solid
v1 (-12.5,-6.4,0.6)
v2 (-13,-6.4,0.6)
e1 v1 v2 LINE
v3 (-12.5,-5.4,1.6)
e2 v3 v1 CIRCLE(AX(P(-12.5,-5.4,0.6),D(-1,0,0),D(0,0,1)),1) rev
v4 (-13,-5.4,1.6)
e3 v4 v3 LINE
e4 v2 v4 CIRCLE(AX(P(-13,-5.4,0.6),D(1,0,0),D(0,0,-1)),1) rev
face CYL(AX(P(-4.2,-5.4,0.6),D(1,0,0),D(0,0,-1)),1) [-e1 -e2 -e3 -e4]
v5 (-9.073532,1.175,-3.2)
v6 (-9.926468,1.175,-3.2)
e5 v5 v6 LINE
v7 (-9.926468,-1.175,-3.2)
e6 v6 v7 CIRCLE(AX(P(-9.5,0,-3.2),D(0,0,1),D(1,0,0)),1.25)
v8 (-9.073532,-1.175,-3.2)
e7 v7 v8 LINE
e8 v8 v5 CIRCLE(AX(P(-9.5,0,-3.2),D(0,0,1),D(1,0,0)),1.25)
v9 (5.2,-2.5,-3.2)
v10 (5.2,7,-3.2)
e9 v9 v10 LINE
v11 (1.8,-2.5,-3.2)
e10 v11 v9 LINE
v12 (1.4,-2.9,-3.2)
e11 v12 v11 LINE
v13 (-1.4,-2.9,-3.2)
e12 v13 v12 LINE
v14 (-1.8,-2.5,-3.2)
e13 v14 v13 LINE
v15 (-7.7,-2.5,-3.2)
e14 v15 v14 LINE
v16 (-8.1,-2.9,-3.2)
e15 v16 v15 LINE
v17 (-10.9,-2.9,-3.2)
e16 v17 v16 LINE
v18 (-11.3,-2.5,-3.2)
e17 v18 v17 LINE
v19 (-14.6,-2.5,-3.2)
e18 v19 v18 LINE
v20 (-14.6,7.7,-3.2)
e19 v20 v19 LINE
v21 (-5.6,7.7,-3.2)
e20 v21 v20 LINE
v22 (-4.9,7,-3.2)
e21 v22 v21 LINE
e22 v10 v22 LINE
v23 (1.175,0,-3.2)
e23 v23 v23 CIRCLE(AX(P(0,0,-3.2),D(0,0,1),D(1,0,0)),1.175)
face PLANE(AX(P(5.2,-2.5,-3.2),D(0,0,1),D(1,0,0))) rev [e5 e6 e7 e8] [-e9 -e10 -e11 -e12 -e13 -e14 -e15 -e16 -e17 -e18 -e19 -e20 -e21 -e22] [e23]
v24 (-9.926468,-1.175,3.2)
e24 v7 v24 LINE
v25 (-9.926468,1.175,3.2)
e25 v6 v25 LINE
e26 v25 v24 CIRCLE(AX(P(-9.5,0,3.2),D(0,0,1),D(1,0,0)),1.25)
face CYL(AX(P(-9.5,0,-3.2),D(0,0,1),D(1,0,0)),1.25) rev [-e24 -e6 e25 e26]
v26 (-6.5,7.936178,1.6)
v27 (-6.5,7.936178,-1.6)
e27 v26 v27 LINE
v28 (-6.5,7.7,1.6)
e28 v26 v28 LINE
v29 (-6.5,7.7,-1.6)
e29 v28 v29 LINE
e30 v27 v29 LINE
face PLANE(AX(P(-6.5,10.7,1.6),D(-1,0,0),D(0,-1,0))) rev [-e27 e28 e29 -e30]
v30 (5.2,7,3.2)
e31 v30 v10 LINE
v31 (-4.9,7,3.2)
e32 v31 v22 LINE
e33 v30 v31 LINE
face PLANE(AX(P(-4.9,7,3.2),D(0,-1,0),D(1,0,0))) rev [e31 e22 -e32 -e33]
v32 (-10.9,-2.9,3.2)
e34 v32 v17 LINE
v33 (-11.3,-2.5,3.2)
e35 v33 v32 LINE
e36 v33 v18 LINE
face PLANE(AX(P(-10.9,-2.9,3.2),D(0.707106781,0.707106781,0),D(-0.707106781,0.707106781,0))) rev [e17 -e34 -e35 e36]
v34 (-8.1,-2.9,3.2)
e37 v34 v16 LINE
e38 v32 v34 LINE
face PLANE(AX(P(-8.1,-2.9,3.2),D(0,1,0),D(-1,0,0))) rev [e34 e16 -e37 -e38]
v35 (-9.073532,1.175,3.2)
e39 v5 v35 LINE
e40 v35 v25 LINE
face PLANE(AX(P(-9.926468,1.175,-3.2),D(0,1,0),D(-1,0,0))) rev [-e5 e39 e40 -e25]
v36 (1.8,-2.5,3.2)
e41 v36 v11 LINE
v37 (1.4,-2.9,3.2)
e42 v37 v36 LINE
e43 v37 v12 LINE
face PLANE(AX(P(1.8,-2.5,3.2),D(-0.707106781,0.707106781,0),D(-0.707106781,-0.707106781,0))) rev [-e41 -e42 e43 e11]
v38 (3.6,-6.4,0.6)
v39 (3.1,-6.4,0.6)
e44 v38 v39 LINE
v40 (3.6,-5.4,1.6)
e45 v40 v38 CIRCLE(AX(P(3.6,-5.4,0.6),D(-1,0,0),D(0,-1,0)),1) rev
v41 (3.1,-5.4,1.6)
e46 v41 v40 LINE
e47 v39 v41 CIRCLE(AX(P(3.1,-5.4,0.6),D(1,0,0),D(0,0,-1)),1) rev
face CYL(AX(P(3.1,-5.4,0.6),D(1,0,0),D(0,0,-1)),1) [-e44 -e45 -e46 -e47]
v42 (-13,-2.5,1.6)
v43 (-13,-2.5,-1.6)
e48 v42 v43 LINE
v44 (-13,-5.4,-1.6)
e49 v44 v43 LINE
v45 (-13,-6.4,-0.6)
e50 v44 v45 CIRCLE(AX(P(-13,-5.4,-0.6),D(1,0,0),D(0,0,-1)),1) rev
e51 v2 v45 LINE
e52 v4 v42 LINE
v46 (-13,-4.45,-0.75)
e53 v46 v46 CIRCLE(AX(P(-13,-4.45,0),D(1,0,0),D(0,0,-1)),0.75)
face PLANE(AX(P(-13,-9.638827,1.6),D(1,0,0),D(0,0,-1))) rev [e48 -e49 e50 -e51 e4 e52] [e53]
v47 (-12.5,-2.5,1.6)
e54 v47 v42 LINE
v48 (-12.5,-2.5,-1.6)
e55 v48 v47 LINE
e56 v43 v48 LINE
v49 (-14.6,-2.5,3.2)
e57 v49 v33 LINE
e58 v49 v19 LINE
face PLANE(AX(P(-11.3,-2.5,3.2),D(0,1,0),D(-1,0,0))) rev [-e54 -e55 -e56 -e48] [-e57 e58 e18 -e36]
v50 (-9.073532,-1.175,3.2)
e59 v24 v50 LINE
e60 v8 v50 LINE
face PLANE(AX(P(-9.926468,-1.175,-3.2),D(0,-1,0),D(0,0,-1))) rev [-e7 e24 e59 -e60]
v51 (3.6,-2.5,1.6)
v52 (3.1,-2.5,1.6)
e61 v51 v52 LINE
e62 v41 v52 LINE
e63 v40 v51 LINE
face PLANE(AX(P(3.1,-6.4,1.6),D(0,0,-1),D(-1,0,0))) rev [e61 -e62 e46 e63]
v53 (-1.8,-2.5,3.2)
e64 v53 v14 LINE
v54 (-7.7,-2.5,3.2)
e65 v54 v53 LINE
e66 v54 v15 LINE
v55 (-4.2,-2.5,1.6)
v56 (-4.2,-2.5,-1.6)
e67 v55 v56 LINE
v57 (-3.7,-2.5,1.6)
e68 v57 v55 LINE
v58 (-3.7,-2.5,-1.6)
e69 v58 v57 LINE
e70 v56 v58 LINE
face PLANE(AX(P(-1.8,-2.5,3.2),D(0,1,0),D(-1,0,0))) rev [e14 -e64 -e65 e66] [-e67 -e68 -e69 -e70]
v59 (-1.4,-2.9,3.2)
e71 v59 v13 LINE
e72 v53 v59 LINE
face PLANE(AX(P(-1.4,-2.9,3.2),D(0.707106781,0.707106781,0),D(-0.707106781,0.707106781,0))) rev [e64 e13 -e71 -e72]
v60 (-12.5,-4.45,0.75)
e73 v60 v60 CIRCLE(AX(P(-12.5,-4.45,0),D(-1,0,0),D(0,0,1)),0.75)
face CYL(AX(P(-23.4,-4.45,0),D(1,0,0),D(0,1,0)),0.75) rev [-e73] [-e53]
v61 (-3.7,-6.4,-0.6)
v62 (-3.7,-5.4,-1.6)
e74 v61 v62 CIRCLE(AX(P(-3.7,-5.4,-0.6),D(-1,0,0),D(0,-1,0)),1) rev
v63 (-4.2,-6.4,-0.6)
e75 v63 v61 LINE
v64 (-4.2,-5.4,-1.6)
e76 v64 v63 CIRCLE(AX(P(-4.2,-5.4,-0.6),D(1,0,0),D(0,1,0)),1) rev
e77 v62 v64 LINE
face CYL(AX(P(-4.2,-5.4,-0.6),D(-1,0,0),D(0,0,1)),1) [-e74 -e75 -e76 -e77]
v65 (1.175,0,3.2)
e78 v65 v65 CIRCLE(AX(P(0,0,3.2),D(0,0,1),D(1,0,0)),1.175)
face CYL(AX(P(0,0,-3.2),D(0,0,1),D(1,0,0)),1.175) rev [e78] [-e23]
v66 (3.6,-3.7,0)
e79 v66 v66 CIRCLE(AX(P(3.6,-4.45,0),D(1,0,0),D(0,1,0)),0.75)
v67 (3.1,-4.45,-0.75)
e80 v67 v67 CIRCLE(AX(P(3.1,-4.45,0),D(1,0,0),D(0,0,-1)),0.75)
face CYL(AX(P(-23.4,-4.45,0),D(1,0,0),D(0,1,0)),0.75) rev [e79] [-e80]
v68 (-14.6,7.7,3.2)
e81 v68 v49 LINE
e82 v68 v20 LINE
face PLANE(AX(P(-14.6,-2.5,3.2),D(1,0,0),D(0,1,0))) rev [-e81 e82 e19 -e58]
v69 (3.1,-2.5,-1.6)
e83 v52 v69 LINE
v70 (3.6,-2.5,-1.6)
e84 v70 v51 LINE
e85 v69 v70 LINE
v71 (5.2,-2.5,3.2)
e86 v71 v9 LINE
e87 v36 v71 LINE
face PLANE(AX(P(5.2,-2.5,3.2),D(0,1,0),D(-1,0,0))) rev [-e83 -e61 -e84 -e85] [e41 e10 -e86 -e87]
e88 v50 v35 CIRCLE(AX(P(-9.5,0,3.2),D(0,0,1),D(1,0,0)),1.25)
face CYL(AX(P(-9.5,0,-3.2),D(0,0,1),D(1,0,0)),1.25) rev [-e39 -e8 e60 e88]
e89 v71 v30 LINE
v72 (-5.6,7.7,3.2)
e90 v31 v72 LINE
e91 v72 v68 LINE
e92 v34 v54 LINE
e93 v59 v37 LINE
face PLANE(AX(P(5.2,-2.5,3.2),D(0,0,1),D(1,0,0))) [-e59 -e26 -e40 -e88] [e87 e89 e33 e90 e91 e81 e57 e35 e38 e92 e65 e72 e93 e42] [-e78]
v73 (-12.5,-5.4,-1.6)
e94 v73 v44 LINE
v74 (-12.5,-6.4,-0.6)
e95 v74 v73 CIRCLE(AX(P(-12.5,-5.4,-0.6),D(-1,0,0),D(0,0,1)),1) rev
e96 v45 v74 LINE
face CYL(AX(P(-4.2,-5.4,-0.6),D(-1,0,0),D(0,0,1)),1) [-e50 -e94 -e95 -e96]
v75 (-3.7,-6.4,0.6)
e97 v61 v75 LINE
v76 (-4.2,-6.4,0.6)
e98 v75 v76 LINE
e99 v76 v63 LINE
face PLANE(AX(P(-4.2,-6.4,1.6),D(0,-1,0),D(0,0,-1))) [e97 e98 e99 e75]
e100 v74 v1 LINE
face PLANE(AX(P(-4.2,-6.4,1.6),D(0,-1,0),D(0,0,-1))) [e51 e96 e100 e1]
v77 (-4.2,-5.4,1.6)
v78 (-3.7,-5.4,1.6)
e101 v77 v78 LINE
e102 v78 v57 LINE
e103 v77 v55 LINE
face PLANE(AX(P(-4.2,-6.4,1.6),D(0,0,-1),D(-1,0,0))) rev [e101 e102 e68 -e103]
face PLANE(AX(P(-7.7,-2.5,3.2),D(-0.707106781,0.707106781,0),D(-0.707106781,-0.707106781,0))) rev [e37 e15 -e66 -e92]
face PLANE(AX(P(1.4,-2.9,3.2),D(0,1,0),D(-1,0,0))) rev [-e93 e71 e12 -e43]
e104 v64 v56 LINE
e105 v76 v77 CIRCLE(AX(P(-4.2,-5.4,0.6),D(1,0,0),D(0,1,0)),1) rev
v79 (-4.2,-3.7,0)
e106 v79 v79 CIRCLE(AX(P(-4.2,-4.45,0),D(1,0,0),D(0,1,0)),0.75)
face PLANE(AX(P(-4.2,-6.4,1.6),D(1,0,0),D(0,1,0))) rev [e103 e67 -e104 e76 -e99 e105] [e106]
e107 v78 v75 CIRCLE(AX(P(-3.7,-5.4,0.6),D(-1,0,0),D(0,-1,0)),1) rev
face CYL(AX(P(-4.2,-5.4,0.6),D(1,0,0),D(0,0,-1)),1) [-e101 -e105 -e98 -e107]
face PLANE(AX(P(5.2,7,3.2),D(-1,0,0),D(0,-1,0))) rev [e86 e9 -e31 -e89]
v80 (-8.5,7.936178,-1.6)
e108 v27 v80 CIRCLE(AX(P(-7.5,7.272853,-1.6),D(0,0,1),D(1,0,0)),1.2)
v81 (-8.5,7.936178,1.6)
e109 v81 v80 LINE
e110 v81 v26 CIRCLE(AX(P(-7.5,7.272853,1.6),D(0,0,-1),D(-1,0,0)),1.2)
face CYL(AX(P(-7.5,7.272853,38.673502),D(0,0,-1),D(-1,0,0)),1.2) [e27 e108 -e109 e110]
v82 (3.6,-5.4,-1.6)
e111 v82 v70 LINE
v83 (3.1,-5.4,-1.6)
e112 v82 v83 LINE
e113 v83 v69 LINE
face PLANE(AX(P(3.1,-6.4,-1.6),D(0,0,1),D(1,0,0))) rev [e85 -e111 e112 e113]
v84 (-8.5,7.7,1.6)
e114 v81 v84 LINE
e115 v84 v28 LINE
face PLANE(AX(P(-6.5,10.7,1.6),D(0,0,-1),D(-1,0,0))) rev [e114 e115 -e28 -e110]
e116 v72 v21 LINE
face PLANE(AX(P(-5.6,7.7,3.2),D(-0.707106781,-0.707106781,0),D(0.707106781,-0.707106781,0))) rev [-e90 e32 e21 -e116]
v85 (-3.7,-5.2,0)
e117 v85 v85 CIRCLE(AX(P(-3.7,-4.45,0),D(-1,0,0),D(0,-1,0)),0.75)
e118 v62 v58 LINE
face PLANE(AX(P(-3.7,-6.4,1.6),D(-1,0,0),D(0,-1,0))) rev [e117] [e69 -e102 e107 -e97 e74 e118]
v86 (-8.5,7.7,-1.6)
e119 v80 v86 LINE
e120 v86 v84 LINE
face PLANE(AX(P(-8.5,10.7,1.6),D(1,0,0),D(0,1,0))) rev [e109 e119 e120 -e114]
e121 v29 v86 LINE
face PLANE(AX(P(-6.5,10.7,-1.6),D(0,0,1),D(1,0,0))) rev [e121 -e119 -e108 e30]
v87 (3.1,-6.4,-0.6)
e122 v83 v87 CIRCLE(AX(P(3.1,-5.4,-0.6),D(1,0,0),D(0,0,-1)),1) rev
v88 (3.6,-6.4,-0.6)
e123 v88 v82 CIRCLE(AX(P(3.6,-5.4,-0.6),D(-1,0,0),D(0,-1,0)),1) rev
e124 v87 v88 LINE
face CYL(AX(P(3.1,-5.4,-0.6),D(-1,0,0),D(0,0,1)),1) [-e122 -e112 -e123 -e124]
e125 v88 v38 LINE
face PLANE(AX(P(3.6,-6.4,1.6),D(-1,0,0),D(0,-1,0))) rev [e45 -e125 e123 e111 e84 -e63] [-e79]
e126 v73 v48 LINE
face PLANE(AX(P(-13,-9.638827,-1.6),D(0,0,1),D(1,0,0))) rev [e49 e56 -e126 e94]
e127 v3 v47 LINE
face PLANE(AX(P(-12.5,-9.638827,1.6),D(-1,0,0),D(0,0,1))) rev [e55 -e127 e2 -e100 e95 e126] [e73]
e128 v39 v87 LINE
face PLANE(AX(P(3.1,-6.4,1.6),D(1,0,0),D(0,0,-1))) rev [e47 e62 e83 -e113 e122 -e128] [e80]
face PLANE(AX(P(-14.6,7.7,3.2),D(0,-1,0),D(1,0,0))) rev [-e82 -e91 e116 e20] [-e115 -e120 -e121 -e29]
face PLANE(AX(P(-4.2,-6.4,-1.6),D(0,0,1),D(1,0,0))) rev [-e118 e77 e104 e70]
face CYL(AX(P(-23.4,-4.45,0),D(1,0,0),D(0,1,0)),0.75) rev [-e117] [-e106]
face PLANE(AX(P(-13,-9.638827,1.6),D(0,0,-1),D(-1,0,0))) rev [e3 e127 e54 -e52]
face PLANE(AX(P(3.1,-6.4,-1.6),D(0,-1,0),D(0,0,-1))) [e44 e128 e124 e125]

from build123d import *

# Parameters (mm, degrees)
CUT_EXTRUDE1_START       = -3.2
CUT_EXTRUDE1_OUTLINE_R   = 1.175
CUT_EXTRUDE1_DEPTH       = 6.4
CUT_EXTRUDE1_START_2     = -1.6
CUT_EXTRUDE1_2_OUTLINE_W = 0.5
CUT_EXTRUDE1_2_OUTLINE_H = 3.9
CUT_EXTRUDE1_2_DEPTH     = 0.8499999
CUT_EXTRUDE1_START_3     = 0.7500001
CUT_EXTRUDE1_3_OUTLINE_W = 0.5
CUT_EXTRUDE1_3_OUTLINE_H = 3.9
CUT_EXTRUDE1_3_DEPTH     = 0.8499999
CUT_EXTRUDE1_4_DEPTH     = 3.2
CUT_EXTRUDE1_START_4     = -13
CUT_EXTRUDE1_5_DEPTH     = 0.5
CUT_EXTRUDE1_START_5     = -4.2
CUT_EXTRUDE1_6_DEPTH     = 0.5
CUT_EXTRUDE1_START_6     = 3.1
CUT_EXTRUDE1_7_DEPTH     = 0.5
FILLET1_R                = 1


with BuildPart() as part:
    # Cut-Extrude1: read off the stored shape, not the designer's step
    # Cut-Extrude1 outline → Cut-Extrude1 (new body)
    with BuildSketch(Plane.XY.offset(CUT_EXTRUDE1_START)):
        Polygon((-14.6, -2.5), (-11.3, -2.5), (-10.9, -2.9), (-8.1, -2.9), (-7.7, -2.5), (-1.8, -2.5), (-1.4, -2.9), (1.4, -2.9), (1.8, -2.5), (5.2, -2.5), (5.2, 7), (-4.9, 7), (-5.6, 7.7), (-14.6, 7.7), align=None)
        with BuildLine():
            ThreePointArc((-9.926468053, -1.175), (-10.75, 0), (-9.926468053, 1.175))
            Line((-9.926468053, 1.175), (-9.073531947, 1.175))
            ThreePointArc((-9.073531947, 1.175), (-8.25, 0), (-9.073531947, -1.175))
            Line((-9.073531947, -1.175), (-9.926468053, -1.175))
        make_face(mode=Mode.SUBTRACT)
        Circle(CUT_EXTRUDE1_OUTLINE_R, mode=Mode.SUBTRACT)
    extrude(amount=CUT_EXTRUDE1_DEPTH)

    # Cut-Extrude1 2 outline → Cut-Extrude1 2 (add)
    with BuildSketch(Plane.XY.offset(CUT_EXTRUDE1_START_2)):
        with Locations((-12.75, -4.45)):
            Rectangle(CUT_EXTRUDE1_2_OUTLINE_W, CUT_EXTRUDE1_2_OUTLINE_H)
        with Locations((-3.95, -4.45)):
            Rectangle(CUT_EXTRUDE1_2_OUTLINE_W, CUT_EXTRUDE1_2_OUTLINE_H)
        with BuildLine():
            Line((-8.5, 7.936178156), (-8.5, 7.7))
            Line((-8.5, 7.7), (-6.5, 7.7))
            Line((-6.5, 7.7), (-6.5, 7.936178156))
            ThreePointArc((-6.5, 7.936178156), (-7.5, 8.472853198), (-8.5, 7.936178156))
        make_face()
        with Locations((3.35, -4.45)):
            Rectangle(CUT_EXTRUDE1_2_OUTLINE_W, CUT_EXTRUDE1_2_OUTLINE_H)
    extrude(amount=CUT_EXTRUDE1_2_DEPTH)

    # Cut-Extrude1 3 outline → Cut-Extrude1 3 (add)
    with BuildSketch(Plane.XY.offset(CUT_EXTRUDE1_START_3)):
        with Locations((-12.75, -4.45)):
            Rectangle(CUT_EXTRUDE1_3_OUTLINE_W, CUT_EXTRUDE1_3_OUTLINE_H)
        with Locations((-3.95, -4.45)):
            Rectangle(CUT_EXTRUDE1_3_OUTLINE_W, CUT_EXTRUDE1_3_OUTLINE_H)
        with BuildLine():
            Line((-8.5, 7.936178156), (-8.5, 7.7))
            Line((-8.5, 7.7), (-6.5, 7.7))
            Line((-6.5, 7.7), (-6.5, 7.936178156))
            ThreePointArc((-6.5, 7.936178156), (-7.5, 8.472853198), (-8.5, 7.936178156))
        make_face()
        with Locations((3.35, -4.45)):
            Rectangle(CUT_EXTRUDE1_3_OUTLINE_W, CUT_EXTRUDE1_3_OUTLINE_H)
    extrude(amount=CUT_EXTRUDE1_3_DEPTH)

    # Cut-Extrude1 4 outline → Cut-Extrude1 4 (add)
    with BuildSketch(Plane.XY.offset(CUT_EXTRUDE1_START_2)):
        with BuildLine():
            Line((-8.5, 7.936178156), (-8.5, 7.7))
            Line((-8.5, 7.7), (-6.5, 7.7))
            Line((-6.5, 7.7), (-6.5, 7.936178156))
            ThreePointArc((-6.5, 7.936178156), (-7.5, 8.472853198), (-8.5, 7.936178156))
        make_face()
    extrude(amount=CUT_EXTRUDE1_4_DEPTH)

    # Cut-Extrude1 5 outline → Cut-Extrude1 5 (add)
    with BuildSketch(Plane.YZ.offset(CUT_EXTRUDE1_START_4)):
        with BuildLine():
            Line((-4.45, 0.75), (-6.4, 0.7500001))
            Line((-6.4, 0.7500001), (-6.4, -0.7500001))
            Line((-6.4, -0.7500001), (-4.45, -0.75))
            ThreePointArc((-4.45, -0.75), (-5.2, 0), (-4.45, 0.75))
        make_face()
        with BuildLine():
            Line((-2.5, 0.7500001), (-4.45, 0.75))
            ThreePointArc((-4.45, 0.75), (-3.7, 0), (-4.45, -0.75))
            Line((-4.45, -0.75), (-2.5, -0.7500001))
            Line((-2.5, -0.7500001), (-2.5, 0.7500001))
        make_face()
    extrude(amount=CUT_EXTRUDE1_5_DEPTH)

    # Cut-Extrude1 6 outline → Cut-Extrude1 6 (add)
    with BuildSketch(Plane.YZ.offset(CUT_EXTRUDE1_START_5)):
        with BuildLine():
            Line((-4.45, 0.75), (-6.4, 0.7500001))
            Line((-6.4, 0.7500001), (-6.4, -0.7500001))
            Line((-6.4, -0.7500001), (-4.45, -0.75))
            ThreePointArc((-4.45, -0.75), (-5.2, 0), (-4.45, 0.75))
        make_face()
        with BuildLine():
            Line((-2.5, 0.7500001), (-4.45, 0.75))
            ThreePointArc((-4.45, 0.75), (-3.7, 0), (-4.45, -0.75))
            Line((-4.45, -0.75), (-2.5, -0.7500001))
            Line((-2.5, -0.7500001), (-2.5, 0.7500001))
        make_face()
    extrude(amount=CUT_EXTRUDE1_6_DEPTH)

    # Cut-Extrude1 7 outline → Cut-Extrude1 7 (add)
    with BuildSketch(Plane.YZ.offset(CUT_EXTRUDE1_START_6)):
        with BuildLine():
            Line((-4.45, 0.75), (-6.4, 0.7500001))
            Line((-6.4, 0.7500001), (-6.4, -0.7500001))
            Line((-6.4, -0.7500001), (-4.45, -0.75))
            ThreePointArc((-4.45, -0.75), (-5.2, 0), (-4.45, 0.75))
        make_face()
        with BuildLine():
            Line((-2.5, 0.7500001), (-4.45, 0.75))
            ThreePointArc((-4.45, 0.75), (-3.7, 0), (-4.45, -0.75))
            Line((-4.45, -0.75), (-2.5, -0.7500001))
            Line((-2.5, -0.7500001), (-2.5, 0.7500001))
        make_face()
    extrude(amount=CUT_EXTRUDE1_7_DEPTH)

    # Fillet1
    fillet1_edges = [part.edges().sort_by_distance(p)[0] for p in [
        (-12.75, -6.4, 1.6),
        (-12.75, -6.4, -1.6),
        (-3.95, -6.4, -1.6),
        (-3.95, -6.4, 1.6),
        (3.35, -6.4, -1.6),
        (3.35, -6.4, 1.6),
    ]]
    fillet(fillet1_edges, radius=FILLET1_R)


solid = part.part
